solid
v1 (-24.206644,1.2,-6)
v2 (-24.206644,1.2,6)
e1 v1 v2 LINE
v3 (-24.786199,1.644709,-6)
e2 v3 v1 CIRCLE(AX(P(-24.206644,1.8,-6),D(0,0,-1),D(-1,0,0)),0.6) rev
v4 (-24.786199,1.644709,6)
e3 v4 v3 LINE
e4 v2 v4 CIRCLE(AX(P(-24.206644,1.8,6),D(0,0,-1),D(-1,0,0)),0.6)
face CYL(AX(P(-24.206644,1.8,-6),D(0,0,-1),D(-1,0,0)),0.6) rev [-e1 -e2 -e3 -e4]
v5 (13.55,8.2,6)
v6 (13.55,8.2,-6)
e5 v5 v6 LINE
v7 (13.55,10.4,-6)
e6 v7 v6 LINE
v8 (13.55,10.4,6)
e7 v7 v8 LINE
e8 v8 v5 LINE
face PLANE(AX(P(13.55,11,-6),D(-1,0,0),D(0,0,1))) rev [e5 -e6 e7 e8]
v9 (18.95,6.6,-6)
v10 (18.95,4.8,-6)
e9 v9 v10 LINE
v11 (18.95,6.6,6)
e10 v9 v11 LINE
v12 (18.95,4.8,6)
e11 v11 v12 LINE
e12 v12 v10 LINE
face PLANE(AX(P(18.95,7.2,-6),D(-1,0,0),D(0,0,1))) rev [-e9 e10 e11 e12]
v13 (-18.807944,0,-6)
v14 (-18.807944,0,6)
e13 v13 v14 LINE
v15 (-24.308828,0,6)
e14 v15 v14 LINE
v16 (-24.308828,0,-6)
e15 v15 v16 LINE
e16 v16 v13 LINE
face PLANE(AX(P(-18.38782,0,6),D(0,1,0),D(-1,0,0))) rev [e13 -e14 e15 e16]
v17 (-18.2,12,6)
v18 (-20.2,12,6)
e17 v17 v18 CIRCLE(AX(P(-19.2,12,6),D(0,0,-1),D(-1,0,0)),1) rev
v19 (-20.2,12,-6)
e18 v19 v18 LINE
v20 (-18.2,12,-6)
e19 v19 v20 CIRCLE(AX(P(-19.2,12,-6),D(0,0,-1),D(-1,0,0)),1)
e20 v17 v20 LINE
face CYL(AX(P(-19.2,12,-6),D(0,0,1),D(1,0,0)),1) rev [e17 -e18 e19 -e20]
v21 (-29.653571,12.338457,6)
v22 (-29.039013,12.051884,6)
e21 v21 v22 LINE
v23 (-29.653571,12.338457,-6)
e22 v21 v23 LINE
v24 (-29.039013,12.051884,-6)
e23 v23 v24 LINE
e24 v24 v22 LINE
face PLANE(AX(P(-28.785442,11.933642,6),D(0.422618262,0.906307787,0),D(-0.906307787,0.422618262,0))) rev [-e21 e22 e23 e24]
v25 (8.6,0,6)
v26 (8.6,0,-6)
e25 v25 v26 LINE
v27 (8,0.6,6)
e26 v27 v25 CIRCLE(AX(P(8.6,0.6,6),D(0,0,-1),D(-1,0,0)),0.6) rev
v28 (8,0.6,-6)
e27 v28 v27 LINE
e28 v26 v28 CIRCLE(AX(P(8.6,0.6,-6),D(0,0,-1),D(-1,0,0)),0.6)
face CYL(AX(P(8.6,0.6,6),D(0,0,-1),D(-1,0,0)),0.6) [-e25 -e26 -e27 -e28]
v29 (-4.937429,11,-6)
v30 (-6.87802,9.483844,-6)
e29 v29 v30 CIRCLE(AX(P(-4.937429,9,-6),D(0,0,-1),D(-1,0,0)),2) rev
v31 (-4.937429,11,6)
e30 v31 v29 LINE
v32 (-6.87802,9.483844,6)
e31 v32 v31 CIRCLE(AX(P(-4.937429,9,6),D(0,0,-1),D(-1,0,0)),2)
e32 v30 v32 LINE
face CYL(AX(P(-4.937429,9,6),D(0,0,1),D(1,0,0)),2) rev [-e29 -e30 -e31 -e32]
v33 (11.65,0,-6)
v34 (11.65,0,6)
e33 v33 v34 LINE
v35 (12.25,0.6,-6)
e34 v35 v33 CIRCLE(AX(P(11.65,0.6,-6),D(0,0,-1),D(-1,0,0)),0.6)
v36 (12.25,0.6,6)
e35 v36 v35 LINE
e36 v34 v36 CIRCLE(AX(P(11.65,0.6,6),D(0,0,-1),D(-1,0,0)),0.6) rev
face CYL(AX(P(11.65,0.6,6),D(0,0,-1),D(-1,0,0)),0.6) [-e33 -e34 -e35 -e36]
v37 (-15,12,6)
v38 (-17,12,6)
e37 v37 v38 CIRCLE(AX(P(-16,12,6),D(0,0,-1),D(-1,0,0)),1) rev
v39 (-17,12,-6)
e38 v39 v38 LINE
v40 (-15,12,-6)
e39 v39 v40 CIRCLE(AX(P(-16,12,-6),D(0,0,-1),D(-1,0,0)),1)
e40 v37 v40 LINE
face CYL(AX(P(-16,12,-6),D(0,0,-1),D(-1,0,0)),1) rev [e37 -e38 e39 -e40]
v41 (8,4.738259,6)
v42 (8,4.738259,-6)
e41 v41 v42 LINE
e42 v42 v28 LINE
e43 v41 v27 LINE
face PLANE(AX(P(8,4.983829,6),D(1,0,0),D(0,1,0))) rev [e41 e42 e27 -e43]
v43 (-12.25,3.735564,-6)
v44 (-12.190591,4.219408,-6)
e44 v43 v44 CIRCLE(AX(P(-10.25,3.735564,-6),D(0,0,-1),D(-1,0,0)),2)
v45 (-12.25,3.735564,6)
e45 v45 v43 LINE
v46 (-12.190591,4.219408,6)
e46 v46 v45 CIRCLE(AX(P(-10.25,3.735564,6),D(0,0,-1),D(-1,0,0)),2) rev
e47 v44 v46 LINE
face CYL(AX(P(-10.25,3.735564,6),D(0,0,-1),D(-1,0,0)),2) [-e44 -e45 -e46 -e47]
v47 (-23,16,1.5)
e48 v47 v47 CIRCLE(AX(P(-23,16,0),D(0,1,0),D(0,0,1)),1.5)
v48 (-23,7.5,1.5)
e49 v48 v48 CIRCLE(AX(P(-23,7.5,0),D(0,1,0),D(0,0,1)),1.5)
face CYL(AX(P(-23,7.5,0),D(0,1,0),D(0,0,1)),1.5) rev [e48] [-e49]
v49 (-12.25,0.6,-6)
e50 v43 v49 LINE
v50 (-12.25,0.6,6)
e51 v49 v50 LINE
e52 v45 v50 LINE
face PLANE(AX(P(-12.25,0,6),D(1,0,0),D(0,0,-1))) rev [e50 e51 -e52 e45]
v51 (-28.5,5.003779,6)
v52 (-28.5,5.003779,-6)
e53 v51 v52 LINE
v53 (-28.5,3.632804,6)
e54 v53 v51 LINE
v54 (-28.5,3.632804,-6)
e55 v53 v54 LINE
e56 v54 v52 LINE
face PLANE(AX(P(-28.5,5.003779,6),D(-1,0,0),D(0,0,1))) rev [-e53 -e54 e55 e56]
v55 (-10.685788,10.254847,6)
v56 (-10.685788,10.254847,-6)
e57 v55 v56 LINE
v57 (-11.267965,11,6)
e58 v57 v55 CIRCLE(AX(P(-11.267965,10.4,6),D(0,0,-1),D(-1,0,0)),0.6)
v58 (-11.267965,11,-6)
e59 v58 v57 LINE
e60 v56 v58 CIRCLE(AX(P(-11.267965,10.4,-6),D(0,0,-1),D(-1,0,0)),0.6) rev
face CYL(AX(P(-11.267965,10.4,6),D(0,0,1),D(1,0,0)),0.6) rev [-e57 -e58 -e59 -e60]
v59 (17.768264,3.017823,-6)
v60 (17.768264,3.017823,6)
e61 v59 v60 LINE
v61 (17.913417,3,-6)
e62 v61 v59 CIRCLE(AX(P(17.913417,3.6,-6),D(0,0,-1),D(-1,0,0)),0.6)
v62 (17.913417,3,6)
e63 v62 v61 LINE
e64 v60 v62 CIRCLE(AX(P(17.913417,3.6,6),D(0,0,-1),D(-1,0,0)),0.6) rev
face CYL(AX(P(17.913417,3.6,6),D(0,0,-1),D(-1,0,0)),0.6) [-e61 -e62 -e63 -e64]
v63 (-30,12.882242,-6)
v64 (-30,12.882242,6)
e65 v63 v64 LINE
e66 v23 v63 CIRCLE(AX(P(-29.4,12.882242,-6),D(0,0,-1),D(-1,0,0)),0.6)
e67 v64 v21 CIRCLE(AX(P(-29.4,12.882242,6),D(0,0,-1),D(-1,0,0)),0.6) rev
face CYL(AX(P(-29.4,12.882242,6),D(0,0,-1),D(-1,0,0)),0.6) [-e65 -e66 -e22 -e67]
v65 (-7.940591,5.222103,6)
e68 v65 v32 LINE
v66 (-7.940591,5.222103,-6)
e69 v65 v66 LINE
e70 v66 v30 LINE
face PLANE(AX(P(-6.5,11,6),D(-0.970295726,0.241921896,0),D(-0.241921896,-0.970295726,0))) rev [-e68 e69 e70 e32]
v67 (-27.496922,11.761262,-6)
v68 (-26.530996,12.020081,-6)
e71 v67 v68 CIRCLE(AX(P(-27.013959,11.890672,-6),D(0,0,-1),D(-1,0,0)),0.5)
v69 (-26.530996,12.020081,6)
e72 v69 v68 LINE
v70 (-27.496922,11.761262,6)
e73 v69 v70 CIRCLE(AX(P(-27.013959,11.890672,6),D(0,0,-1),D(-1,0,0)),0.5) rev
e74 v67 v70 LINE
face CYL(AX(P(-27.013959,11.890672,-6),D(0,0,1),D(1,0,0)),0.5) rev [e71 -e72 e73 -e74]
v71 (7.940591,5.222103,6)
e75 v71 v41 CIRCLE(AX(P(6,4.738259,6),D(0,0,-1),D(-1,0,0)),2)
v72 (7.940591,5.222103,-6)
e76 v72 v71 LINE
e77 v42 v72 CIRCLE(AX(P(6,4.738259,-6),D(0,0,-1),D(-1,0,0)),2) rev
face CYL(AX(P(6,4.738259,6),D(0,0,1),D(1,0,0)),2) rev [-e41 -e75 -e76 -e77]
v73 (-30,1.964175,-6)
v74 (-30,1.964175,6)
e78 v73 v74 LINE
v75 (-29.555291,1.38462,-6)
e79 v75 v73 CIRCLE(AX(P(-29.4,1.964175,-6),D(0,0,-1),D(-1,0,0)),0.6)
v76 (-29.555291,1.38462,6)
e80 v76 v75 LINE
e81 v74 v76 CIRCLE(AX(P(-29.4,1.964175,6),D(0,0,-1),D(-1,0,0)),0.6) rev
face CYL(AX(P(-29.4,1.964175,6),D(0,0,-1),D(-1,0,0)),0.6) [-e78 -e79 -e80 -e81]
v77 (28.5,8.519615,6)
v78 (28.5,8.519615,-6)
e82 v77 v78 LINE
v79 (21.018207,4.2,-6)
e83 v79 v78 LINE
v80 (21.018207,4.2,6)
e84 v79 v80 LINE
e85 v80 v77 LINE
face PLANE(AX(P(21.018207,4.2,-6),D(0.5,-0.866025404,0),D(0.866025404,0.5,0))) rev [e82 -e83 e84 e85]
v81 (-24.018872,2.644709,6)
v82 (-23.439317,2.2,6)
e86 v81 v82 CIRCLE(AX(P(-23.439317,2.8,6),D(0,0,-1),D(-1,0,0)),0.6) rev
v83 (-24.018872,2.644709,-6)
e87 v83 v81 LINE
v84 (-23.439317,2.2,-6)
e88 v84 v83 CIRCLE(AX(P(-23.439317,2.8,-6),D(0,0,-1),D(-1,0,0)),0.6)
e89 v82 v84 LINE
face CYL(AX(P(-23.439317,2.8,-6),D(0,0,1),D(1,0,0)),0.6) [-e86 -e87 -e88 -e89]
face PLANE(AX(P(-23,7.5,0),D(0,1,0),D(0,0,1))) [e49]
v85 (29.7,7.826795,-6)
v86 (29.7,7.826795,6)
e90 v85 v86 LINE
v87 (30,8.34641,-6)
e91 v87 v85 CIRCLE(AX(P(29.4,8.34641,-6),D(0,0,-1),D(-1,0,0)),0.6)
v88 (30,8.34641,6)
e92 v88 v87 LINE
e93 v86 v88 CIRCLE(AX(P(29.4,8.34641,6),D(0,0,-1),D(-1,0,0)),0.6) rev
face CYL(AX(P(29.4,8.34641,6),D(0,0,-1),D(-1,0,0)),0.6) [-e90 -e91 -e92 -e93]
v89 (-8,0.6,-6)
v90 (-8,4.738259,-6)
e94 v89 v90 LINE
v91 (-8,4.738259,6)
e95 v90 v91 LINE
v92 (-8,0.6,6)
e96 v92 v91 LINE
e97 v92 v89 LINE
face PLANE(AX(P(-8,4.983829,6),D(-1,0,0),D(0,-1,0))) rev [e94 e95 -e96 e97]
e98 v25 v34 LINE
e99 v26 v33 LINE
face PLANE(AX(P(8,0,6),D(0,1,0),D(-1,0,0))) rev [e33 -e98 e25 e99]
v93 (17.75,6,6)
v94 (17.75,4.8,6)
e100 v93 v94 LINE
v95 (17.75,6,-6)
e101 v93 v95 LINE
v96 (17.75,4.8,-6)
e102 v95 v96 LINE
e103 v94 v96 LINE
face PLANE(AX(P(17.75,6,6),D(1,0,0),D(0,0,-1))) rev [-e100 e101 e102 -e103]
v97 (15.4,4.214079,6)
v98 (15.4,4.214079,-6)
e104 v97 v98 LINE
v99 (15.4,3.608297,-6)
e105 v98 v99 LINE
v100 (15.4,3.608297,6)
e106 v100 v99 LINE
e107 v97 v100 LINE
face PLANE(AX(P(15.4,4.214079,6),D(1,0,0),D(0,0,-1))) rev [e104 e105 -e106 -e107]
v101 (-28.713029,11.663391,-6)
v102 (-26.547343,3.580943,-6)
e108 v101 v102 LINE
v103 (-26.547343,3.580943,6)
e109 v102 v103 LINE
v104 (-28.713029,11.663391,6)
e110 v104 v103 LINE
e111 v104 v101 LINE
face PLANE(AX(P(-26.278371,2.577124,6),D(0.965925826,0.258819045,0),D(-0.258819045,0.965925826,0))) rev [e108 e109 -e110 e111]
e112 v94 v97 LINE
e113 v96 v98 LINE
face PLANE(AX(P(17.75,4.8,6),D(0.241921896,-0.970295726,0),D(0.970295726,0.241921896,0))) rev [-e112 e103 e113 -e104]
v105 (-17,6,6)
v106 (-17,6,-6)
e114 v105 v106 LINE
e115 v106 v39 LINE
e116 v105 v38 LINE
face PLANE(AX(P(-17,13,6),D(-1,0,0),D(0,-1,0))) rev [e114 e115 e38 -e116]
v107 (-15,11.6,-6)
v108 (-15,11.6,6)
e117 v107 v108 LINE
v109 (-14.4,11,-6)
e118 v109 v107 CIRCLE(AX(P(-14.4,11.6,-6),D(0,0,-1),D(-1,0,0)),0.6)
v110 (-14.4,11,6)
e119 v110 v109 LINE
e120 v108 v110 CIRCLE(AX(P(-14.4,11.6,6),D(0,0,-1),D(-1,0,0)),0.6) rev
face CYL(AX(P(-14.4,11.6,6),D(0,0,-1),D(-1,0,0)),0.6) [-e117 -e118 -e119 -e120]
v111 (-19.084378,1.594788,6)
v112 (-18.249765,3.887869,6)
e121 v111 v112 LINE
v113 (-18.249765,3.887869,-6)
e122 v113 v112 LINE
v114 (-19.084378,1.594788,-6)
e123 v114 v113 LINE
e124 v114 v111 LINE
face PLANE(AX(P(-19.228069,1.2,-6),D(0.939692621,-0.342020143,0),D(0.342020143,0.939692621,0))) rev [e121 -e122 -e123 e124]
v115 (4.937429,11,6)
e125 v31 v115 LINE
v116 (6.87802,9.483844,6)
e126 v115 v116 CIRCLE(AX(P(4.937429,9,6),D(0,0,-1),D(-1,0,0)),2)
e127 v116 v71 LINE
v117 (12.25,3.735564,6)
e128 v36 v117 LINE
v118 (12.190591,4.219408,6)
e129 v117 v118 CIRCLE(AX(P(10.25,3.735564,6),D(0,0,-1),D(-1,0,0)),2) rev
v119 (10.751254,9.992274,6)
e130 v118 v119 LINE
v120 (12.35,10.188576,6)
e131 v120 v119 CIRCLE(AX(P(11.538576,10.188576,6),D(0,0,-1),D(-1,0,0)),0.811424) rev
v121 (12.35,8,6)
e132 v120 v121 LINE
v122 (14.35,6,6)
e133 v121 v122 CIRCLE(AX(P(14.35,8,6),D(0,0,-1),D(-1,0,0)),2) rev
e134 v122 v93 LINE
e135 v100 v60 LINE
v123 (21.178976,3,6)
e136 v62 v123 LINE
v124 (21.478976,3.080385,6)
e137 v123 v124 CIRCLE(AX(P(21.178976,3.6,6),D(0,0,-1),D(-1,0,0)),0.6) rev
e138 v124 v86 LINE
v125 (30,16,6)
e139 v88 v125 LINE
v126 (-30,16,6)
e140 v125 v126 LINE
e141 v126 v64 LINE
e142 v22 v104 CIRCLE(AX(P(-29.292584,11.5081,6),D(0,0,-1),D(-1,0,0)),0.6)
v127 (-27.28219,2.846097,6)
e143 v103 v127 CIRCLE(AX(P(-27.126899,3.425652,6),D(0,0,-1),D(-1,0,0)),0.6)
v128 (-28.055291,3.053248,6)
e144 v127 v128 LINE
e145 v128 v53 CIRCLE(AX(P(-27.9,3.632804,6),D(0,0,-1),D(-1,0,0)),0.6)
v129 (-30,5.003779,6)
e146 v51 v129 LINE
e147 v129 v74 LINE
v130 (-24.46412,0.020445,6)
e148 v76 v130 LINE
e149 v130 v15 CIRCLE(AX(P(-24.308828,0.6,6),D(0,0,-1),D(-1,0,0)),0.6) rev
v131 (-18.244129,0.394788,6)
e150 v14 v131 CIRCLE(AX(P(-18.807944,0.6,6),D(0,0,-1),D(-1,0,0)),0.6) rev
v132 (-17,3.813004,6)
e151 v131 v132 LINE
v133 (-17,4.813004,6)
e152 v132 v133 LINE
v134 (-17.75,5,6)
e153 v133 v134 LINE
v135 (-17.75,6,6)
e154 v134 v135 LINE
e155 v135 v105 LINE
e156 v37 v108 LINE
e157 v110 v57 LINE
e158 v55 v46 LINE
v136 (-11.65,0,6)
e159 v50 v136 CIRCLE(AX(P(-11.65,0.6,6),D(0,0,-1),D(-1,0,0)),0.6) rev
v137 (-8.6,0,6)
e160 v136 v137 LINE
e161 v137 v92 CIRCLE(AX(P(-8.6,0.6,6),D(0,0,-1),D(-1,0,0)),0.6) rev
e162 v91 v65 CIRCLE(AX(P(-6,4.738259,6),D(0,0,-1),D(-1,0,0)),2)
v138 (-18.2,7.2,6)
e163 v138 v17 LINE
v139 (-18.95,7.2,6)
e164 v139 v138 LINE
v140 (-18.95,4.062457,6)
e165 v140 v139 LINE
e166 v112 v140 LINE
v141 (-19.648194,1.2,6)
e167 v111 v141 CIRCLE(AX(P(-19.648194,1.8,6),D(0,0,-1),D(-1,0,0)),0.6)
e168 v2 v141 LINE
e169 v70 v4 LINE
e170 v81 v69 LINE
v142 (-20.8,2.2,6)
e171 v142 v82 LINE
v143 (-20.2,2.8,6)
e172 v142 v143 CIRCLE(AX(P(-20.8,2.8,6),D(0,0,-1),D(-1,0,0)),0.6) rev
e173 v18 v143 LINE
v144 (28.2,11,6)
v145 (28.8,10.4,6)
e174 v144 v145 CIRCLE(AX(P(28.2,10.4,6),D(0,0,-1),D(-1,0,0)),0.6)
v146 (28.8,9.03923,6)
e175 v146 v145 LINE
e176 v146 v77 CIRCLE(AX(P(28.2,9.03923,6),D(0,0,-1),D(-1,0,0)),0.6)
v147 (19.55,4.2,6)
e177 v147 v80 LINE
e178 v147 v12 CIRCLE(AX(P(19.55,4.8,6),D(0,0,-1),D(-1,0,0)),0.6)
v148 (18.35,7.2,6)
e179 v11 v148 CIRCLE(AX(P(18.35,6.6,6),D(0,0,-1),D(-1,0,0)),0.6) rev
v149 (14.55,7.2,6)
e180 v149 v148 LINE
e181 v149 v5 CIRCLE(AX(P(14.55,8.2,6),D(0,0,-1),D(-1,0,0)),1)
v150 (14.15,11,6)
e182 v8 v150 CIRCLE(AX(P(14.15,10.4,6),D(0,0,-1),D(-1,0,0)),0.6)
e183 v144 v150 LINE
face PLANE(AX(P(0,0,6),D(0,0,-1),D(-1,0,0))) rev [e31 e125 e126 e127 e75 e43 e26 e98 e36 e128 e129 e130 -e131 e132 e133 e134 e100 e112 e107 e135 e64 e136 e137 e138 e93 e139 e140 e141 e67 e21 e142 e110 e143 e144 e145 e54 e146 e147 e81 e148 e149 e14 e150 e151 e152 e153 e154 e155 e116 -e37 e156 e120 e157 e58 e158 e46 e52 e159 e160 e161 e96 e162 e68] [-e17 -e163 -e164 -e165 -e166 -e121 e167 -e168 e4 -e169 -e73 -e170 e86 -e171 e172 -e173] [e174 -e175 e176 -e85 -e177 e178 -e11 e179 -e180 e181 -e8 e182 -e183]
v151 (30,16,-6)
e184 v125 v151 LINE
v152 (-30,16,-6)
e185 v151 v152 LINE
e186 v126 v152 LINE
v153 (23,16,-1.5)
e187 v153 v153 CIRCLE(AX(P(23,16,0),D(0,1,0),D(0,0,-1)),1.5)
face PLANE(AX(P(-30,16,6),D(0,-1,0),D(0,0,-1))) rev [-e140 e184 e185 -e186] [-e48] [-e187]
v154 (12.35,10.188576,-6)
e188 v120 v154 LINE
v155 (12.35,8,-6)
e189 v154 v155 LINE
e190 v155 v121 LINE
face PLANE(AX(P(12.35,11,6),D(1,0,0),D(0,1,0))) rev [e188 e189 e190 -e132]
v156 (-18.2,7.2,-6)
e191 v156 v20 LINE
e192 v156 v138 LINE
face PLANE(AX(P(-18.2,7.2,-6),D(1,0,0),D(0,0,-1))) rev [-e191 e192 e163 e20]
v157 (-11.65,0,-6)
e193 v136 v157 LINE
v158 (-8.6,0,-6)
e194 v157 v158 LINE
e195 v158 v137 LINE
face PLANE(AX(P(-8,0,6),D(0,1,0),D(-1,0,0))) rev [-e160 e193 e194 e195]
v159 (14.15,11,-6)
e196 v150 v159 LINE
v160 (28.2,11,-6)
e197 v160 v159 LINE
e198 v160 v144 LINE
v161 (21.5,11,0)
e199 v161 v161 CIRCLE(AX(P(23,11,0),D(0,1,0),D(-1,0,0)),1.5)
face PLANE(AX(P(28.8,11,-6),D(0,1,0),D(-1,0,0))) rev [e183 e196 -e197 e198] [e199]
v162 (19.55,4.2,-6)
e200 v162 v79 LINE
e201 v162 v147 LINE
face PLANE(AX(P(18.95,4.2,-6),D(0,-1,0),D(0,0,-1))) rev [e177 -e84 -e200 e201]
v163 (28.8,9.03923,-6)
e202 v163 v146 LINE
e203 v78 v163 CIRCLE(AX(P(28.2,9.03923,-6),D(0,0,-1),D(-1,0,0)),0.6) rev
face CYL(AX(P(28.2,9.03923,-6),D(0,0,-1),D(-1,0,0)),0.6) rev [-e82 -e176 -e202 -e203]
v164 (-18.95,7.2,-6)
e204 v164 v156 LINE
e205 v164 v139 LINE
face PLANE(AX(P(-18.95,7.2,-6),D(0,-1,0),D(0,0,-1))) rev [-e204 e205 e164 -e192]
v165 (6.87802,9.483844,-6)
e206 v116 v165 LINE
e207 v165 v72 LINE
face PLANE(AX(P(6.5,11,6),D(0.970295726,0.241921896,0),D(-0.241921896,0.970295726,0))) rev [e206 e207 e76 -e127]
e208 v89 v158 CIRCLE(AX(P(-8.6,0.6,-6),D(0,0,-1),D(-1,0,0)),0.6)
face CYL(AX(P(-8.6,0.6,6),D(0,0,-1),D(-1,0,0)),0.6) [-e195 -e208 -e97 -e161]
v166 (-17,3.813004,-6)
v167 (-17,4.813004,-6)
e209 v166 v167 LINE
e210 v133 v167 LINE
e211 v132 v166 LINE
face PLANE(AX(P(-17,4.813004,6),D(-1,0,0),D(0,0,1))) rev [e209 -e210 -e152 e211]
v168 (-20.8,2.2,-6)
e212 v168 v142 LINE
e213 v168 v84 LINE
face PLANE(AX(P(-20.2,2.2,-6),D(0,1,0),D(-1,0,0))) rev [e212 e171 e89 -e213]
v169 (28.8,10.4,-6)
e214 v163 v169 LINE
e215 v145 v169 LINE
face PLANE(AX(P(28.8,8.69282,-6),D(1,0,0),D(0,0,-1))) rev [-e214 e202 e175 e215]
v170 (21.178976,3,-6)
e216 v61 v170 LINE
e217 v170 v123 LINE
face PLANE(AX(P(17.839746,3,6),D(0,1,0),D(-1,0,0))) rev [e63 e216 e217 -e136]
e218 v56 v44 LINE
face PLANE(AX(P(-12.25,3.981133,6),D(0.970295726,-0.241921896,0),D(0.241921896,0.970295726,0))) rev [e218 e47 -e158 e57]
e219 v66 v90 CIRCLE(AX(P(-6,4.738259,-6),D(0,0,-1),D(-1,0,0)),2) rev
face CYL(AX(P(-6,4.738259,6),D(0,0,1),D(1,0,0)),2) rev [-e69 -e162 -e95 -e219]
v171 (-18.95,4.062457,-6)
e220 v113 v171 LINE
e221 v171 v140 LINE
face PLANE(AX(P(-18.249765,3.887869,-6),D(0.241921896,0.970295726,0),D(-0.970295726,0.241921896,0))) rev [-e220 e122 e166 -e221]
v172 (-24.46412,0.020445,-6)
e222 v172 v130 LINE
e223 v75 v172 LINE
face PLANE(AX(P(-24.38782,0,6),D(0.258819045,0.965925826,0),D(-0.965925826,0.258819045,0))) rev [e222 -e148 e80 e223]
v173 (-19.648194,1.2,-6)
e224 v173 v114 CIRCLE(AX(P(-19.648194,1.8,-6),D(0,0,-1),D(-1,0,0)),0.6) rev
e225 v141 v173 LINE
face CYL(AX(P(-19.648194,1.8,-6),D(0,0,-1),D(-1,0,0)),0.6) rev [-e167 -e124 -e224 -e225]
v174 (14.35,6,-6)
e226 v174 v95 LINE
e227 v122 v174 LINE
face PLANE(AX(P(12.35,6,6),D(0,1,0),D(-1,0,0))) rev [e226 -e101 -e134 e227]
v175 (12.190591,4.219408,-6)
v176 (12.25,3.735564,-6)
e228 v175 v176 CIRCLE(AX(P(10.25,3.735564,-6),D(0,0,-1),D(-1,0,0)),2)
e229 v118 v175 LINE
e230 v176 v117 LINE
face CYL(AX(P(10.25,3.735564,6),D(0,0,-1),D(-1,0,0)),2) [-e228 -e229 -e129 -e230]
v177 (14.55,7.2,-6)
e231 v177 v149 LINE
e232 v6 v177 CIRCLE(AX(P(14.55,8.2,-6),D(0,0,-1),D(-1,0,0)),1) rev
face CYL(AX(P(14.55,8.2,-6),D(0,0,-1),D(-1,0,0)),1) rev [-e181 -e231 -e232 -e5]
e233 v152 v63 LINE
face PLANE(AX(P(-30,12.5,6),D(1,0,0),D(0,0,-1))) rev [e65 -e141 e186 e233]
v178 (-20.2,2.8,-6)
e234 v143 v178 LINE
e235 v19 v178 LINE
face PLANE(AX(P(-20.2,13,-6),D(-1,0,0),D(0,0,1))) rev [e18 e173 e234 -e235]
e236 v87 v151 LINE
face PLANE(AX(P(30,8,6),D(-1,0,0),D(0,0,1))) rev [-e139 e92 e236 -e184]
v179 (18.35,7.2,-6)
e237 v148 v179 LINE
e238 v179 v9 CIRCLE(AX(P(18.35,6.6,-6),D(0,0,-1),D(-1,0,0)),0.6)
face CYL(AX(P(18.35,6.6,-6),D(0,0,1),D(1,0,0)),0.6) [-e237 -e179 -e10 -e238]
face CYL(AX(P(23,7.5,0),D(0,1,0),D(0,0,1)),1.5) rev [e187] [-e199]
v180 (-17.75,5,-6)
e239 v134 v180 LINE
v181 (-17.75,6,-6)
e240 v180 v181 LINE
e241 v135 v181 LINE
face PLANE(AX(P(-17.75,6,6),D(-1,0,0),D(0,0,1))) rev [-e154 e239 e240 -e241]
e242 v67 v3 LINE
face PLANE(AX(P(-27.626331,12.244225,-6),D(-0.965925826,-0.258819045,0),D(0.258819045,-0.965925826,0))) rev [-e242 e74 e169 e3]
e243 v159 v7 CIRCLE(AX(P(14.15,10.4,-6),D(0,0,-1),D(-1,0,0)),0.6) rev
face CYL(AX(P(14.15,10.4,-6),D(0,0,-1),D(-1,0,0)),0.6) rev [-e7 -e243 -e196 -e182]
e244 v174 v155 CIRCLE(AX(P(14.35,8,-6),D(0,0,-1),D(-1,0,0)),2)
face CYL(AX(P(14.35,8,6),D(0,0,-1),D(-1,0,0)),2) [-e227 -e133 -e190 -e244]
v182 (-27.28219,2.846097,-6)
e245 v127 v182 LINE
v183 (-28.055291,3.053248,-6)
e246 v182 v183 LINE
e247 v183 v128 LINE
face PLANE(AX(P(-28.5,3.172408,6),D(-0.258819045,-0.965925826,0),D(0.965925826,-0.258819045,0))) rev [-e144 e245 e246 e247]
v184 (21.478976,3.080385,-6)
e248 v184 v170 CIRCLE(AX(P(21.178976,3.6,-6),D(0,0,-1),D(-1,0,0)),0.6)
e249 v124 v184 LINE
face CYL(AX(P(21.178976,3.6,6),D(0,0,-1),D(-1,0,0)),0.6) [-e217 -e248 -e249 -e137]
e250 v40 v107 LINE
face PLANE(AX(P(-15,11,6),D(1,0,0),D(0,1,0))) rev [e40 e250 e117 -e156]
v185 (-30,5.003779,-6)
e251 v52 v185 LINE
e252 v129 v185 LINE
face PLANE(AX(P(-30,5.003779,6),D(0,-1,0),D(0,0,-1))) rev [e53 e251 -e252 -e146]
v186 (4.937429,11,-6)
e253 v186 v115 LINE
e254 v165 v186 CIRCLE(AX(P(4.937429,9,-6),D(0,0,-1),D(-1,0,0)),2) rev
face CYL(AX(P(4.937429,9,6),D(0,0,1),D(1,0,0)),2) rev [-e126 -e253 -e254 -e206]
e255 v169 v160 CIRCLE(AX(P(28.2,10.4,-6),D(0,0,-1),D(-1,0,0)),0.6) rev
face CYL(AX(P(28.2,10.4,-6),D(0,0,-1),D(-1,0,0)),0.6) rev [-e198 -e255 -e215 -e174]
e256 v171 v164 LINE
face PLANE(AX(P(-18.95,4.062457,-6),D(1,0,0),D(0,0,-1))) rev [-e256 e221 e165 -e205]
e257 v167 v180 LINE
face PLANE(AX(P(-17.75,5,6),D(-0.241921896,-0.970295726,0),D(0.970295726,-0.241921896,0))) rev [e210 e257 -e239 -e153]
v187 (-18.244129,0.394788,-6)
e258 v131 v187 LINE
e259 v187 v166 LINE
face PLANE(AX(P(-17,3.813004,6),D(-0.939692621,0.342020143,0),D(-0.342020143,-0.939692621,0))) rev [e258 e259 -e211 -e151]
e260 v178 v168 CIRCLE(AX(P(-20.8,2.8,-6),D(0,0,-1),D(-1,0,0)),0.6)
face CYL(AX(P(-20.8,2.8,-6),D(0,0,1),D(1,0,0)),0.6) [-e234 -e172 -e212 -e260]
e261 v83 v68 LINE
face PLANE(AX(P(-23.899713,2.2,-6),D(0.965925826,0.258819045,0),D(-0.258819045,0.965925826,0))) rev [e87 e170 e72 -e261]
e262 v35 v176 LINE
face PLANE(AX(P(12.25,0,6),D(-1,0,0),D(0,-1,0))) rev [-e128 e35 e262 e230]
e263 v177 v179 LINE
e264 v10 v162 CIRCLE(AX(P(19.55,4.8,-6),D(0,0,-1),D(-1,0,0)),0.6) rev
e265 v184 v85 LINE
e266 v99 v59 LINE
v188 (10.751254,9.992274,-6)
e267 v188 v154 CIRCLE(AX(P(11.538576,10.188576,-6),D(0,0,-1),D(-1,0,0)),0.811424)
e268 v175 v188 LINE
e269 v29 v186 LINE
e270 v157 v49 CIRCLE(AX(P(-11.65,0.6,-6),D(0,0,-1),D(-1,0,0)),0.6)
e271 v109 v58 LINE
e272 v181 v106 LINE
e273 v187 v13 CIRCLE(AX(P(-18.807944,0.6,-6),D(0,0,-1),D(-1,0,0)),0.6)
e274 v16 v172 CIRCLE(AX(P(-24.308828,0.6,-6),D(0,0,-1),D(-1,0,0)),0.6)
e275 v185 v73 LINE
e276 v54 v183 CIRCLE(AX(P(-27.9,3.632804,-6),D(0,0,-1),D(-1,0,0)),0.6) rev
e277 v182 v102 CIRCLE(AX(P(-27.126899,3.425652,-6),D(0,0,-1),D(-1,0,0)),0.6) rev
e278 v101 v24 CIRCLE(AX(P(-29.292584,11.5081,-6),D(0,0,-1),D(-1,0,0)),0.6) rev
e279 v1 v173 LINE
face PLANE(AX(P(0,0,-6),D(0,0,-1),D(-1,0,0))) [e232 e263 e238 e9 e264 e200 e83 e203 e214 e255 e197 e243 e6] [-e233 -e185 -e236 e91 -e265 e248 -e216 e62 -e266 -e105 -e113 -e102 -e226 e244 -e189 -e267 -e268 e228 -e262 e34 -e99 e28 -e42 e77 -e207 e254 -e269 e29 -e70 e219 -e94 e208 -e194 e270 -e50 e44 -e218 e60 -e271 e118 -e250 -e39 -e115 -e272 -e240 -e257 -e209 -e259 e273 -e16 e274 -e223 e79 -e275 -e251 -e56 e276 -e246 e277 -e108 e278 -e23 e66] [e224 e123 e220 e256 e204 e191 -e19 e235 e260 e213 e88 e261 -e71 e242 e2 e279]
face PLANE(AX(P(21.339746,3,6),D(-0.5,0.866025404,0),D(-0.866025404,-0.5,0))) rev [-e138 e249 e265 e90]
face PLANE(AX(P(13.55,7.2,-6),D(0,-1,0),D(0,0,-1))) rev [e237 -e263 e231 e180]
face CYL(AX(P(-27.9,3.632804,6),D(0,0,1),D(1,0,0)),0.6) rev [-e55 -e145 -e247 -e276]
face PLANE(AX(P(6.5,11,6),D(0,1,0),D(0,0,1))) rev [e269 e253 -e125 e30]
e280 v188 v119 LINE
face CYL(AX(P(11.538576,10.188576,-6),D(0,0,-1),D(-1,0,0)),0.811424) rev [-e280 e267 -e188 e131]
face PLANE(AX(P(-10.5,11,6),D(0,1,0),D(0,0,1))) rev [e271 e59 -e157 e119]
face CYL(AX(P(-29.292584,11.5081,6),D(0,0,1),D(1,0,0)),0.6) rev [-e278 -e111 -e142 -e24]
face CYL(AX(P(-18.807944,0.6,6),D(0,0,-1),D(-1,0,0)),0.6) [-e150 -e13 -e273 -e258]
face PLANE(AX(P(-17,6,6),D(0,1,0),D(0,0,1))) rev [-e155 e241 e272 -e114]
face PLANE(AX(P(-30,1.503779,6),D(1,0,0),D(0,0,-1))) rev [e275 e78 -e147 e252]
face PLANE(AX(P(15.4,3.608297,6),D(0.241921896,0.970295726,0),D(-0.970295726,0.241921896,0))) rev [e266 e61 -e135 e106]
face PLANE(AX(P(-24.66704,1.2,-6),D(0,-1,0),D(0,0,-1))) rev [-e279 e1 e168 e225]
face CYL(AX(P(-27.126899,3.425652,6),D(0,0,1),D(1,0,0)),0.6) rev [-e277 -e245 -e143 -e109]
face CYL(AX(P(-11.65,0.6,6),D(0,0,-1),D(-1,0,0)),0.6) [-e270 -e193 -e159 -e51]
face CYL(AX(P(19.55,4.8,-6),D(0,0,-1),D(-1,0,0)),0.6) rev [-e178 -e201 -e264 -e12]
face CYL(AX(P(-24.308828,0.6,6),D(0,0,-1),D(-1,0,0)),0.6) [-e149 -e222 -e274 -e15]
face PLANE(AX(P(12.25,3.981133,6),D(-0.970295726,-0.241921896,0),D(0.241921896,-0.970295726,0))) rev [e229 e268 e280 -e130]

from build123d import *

# Parameters (mm, degrees)
BOSS_EXTRUDE1_DEPTH     = 6
CUT_EXTRUDE1_DEPTH      = 35.525353003
CUT_EXTRUDE1_DEPTH_BACK = 35.525353003
FILLET1_R               = 2
FILLET2_R               = 1
FILLET3_R               = 0.811424
FILLET4_R               = 2
FILLET5_R               = 1
FILLET6_R               = 1
FILLET7_R               = 0.5
FILLET8_R               = 0.6
SKETCH4_R               = 1.5
CUT_EXTRUDE2_DEPTH      = 8.5


with BuildPart() as part:
    # Sketch2 → Boss-Extrude1 (new, symmetric)
    with BuildSketch(Plane.XY):
        Polygon((6.5, 11), (-6.5, 11), (-8, 4.9838286), (-8, 0), (-12.25, 0), (-12.25, 3.981133366), (-10.5, 11), (-15, 11), (-15, 13), (-17, 13), (-17, 6), (-17.75, 6), (-17.75, 5), (-17, 4.813003998), (-17, 3.813003998), (-18.387819958, 0), (-24.387819958, 0), (-30, 1.50377911), (-30, 5.00377911), (-28.5, 5.00377911), (-28.5, 3.172407682), (-26.2783706, 2.577123878), (-28.785442178, 11.933642386), (-30, 12.5), (-30, 16), (0, 16), (30, 16), (30, 8), (21.339745962, 3), (17.839745962, 3), (15.4, 3.608296988), (15.4, 4.214079193), (17.75, 4.8), (17.75, 6), (12.35, 6), (12.35, 11), (10.5, 11), (12.25, 3.981133366), (12.25, 0), (8, 0), (8, 4.9838286), align=None)
    extrude(amount=BOSS_EXTRUDE1_DEPTH, both=True)

    # Sketch3 → Cut-Extrude1 (cut, two sides: drawn at the far end of the back side and taken through both)
    with BuildSketch(Plane.XY.offset(-CUT_EXTRUDE1_DEPTH_BACK)):
        Polygon((-27.626331186, 12.24422524), (-24.667039952, 1.2), (-19.228069004, 1.2), (-18.249764702, 3.88786898), (-18.95, 4.062457248), (-18.95, 7.2), (-18.2, 7.2), (-18.2, 13), (-20.2, 13), (-20.2, 2.2), (-23.899712964, 2.2), (-26.66040536, 12.503044285), align=None)
        Polygon((13.55, 11), (13.55, 7.2), (18.95, 7.2), (18.95, 4.2), (21.018206931, 4.2), (28.8, 8.692820323), (28.8, 11), align=None)
    extrude(amount=CUT_EXTRUDE1_DEPTH + CUT_EXTRUDE1_DEPTH_BACK, mode=Mode.SUBTRACT)

    # Fillet1
    fillet1_edges = [part.edges().sort_by_distance(p)[0] for p in [
        (12.35, 6, 0),
    ]]
    fillet(fillet1_edges, radius=FILLET1_R)

    # Fillet2
    fillet2_edges = [part.edges().sort_by_distance(p)[0] for p in [
        (13.55, 7.2, 0),
    ]]
    fillet(fillet2_edges, radius=FILLET2_R)

    # Fillet3
    fillet3_edges = [part.edges().sort_by_distance(p)[0] for p in [
        (12.35, 11, 0),
        (10.5, 11, 0),
    ]]
    fillet(fillet3_edges, radius=FILLET3_R)

    # Fillet4
    fillet4_edges = [part.edges().sort_by_distance(p)[0] for p in [
        (12.25, 3.981133366, 0),
        (8, 4.9838286, 0),
        (6.5, 11, 0),
        (-6.5, 11, 0),
        (-8, 4.9838286, 0),
        (-12.25, 3.981133366, 0),
    ]]
    fillet(fillet4_edges, radius=FILLET4_R)

    # Fillet5
    fillet5_edges = [part.edges().sort_by_distance(p)[0] for p in [
        (-20.2, 13, 0),
        (-18.2, 13, 0),
    ]]
    fillet(fillet5_edges, radius=FILLET5_R - 0.0001)  # a hair under: the kernel refuses the full size

    # Fillet6
    fillet6_edges = [part.edges().sort_by_distance(p)[0] for p in [
        (-15, 13, 0),
        (-17, 13, 0),
    ]]
    fillet(fillet6_edges, radius=FILLET6_R - 0.0001)  # a hair under: the kernel refuses the full size

    # Fillet7
    fillet7_edges = [part.edges().sort_by_distance(p)[0] for p in [
        (-27.626331186, 12.24422524, 0),
        (-26.66040536, 12.503044285, 0),
    ]]
    fillet(fillet7_edges, radius=FILLET7_R - 0.0001)  # a hair under: the kernel refuses the full size

    # Fillet8
    fillet8_edges = [part.edges().sort_by_distance(p)[0] for p in [
        (-23.899712964, 2.2, 0),
        (-20.2, 2.2, 0),
        (-19.228069004, 1.2, 0),
        (-24.667039952, 1.2, 0),
        (13.55, 11, 0),
        (28.8, 11, 0),
        (28.8, 8.692820323, 0),
        (18.95, 4.2, 0),
        (18.95, 7.2, 0),
        (12.25, 0, 0),
        (8, 0, 0),
        (-8, 0, 0),
        (-12.25, 0, 0),
        (-10.5, 11, 0),
        (-15, 11, 0),
        (-18.387819958, 0, 0),
        (-24.387819958, 0, 0),
        (-30, 1.50377911, 0),
        (-28.5, 3.172407682, 0),
        (-26.2783706, 2.577123878, 0),
        (-28.785442178, 11.933642386, 0),
        (-30, 12.5, 0),
        (30, 8, 0),
        (21.339745962, 3, 0),
        (17.839745962, 3, 0),
    ]]
    fillet(fillet8_edges, radius=FILLET8_R)

    # Sketch4 → Cut-Extrude2 (cut)
    with BuildSketch(Plane(origin=(0, 16, 0), x_dir=(1, 0, 0), z_dir=(0, 1, 0))):
        with Locations(Location((-23, 0, 0), (0, 0, 270))):
            Circle(SKETCH4_R)
        with Locations(Location((23, 0, 0), (0, 0, 180))):
            Circle(SKETCH4_R)
    extrude(amount=-CUT_EXTRUDE2_DEPTH, mode=Mode.SUBTRACT)


solid = part.part
